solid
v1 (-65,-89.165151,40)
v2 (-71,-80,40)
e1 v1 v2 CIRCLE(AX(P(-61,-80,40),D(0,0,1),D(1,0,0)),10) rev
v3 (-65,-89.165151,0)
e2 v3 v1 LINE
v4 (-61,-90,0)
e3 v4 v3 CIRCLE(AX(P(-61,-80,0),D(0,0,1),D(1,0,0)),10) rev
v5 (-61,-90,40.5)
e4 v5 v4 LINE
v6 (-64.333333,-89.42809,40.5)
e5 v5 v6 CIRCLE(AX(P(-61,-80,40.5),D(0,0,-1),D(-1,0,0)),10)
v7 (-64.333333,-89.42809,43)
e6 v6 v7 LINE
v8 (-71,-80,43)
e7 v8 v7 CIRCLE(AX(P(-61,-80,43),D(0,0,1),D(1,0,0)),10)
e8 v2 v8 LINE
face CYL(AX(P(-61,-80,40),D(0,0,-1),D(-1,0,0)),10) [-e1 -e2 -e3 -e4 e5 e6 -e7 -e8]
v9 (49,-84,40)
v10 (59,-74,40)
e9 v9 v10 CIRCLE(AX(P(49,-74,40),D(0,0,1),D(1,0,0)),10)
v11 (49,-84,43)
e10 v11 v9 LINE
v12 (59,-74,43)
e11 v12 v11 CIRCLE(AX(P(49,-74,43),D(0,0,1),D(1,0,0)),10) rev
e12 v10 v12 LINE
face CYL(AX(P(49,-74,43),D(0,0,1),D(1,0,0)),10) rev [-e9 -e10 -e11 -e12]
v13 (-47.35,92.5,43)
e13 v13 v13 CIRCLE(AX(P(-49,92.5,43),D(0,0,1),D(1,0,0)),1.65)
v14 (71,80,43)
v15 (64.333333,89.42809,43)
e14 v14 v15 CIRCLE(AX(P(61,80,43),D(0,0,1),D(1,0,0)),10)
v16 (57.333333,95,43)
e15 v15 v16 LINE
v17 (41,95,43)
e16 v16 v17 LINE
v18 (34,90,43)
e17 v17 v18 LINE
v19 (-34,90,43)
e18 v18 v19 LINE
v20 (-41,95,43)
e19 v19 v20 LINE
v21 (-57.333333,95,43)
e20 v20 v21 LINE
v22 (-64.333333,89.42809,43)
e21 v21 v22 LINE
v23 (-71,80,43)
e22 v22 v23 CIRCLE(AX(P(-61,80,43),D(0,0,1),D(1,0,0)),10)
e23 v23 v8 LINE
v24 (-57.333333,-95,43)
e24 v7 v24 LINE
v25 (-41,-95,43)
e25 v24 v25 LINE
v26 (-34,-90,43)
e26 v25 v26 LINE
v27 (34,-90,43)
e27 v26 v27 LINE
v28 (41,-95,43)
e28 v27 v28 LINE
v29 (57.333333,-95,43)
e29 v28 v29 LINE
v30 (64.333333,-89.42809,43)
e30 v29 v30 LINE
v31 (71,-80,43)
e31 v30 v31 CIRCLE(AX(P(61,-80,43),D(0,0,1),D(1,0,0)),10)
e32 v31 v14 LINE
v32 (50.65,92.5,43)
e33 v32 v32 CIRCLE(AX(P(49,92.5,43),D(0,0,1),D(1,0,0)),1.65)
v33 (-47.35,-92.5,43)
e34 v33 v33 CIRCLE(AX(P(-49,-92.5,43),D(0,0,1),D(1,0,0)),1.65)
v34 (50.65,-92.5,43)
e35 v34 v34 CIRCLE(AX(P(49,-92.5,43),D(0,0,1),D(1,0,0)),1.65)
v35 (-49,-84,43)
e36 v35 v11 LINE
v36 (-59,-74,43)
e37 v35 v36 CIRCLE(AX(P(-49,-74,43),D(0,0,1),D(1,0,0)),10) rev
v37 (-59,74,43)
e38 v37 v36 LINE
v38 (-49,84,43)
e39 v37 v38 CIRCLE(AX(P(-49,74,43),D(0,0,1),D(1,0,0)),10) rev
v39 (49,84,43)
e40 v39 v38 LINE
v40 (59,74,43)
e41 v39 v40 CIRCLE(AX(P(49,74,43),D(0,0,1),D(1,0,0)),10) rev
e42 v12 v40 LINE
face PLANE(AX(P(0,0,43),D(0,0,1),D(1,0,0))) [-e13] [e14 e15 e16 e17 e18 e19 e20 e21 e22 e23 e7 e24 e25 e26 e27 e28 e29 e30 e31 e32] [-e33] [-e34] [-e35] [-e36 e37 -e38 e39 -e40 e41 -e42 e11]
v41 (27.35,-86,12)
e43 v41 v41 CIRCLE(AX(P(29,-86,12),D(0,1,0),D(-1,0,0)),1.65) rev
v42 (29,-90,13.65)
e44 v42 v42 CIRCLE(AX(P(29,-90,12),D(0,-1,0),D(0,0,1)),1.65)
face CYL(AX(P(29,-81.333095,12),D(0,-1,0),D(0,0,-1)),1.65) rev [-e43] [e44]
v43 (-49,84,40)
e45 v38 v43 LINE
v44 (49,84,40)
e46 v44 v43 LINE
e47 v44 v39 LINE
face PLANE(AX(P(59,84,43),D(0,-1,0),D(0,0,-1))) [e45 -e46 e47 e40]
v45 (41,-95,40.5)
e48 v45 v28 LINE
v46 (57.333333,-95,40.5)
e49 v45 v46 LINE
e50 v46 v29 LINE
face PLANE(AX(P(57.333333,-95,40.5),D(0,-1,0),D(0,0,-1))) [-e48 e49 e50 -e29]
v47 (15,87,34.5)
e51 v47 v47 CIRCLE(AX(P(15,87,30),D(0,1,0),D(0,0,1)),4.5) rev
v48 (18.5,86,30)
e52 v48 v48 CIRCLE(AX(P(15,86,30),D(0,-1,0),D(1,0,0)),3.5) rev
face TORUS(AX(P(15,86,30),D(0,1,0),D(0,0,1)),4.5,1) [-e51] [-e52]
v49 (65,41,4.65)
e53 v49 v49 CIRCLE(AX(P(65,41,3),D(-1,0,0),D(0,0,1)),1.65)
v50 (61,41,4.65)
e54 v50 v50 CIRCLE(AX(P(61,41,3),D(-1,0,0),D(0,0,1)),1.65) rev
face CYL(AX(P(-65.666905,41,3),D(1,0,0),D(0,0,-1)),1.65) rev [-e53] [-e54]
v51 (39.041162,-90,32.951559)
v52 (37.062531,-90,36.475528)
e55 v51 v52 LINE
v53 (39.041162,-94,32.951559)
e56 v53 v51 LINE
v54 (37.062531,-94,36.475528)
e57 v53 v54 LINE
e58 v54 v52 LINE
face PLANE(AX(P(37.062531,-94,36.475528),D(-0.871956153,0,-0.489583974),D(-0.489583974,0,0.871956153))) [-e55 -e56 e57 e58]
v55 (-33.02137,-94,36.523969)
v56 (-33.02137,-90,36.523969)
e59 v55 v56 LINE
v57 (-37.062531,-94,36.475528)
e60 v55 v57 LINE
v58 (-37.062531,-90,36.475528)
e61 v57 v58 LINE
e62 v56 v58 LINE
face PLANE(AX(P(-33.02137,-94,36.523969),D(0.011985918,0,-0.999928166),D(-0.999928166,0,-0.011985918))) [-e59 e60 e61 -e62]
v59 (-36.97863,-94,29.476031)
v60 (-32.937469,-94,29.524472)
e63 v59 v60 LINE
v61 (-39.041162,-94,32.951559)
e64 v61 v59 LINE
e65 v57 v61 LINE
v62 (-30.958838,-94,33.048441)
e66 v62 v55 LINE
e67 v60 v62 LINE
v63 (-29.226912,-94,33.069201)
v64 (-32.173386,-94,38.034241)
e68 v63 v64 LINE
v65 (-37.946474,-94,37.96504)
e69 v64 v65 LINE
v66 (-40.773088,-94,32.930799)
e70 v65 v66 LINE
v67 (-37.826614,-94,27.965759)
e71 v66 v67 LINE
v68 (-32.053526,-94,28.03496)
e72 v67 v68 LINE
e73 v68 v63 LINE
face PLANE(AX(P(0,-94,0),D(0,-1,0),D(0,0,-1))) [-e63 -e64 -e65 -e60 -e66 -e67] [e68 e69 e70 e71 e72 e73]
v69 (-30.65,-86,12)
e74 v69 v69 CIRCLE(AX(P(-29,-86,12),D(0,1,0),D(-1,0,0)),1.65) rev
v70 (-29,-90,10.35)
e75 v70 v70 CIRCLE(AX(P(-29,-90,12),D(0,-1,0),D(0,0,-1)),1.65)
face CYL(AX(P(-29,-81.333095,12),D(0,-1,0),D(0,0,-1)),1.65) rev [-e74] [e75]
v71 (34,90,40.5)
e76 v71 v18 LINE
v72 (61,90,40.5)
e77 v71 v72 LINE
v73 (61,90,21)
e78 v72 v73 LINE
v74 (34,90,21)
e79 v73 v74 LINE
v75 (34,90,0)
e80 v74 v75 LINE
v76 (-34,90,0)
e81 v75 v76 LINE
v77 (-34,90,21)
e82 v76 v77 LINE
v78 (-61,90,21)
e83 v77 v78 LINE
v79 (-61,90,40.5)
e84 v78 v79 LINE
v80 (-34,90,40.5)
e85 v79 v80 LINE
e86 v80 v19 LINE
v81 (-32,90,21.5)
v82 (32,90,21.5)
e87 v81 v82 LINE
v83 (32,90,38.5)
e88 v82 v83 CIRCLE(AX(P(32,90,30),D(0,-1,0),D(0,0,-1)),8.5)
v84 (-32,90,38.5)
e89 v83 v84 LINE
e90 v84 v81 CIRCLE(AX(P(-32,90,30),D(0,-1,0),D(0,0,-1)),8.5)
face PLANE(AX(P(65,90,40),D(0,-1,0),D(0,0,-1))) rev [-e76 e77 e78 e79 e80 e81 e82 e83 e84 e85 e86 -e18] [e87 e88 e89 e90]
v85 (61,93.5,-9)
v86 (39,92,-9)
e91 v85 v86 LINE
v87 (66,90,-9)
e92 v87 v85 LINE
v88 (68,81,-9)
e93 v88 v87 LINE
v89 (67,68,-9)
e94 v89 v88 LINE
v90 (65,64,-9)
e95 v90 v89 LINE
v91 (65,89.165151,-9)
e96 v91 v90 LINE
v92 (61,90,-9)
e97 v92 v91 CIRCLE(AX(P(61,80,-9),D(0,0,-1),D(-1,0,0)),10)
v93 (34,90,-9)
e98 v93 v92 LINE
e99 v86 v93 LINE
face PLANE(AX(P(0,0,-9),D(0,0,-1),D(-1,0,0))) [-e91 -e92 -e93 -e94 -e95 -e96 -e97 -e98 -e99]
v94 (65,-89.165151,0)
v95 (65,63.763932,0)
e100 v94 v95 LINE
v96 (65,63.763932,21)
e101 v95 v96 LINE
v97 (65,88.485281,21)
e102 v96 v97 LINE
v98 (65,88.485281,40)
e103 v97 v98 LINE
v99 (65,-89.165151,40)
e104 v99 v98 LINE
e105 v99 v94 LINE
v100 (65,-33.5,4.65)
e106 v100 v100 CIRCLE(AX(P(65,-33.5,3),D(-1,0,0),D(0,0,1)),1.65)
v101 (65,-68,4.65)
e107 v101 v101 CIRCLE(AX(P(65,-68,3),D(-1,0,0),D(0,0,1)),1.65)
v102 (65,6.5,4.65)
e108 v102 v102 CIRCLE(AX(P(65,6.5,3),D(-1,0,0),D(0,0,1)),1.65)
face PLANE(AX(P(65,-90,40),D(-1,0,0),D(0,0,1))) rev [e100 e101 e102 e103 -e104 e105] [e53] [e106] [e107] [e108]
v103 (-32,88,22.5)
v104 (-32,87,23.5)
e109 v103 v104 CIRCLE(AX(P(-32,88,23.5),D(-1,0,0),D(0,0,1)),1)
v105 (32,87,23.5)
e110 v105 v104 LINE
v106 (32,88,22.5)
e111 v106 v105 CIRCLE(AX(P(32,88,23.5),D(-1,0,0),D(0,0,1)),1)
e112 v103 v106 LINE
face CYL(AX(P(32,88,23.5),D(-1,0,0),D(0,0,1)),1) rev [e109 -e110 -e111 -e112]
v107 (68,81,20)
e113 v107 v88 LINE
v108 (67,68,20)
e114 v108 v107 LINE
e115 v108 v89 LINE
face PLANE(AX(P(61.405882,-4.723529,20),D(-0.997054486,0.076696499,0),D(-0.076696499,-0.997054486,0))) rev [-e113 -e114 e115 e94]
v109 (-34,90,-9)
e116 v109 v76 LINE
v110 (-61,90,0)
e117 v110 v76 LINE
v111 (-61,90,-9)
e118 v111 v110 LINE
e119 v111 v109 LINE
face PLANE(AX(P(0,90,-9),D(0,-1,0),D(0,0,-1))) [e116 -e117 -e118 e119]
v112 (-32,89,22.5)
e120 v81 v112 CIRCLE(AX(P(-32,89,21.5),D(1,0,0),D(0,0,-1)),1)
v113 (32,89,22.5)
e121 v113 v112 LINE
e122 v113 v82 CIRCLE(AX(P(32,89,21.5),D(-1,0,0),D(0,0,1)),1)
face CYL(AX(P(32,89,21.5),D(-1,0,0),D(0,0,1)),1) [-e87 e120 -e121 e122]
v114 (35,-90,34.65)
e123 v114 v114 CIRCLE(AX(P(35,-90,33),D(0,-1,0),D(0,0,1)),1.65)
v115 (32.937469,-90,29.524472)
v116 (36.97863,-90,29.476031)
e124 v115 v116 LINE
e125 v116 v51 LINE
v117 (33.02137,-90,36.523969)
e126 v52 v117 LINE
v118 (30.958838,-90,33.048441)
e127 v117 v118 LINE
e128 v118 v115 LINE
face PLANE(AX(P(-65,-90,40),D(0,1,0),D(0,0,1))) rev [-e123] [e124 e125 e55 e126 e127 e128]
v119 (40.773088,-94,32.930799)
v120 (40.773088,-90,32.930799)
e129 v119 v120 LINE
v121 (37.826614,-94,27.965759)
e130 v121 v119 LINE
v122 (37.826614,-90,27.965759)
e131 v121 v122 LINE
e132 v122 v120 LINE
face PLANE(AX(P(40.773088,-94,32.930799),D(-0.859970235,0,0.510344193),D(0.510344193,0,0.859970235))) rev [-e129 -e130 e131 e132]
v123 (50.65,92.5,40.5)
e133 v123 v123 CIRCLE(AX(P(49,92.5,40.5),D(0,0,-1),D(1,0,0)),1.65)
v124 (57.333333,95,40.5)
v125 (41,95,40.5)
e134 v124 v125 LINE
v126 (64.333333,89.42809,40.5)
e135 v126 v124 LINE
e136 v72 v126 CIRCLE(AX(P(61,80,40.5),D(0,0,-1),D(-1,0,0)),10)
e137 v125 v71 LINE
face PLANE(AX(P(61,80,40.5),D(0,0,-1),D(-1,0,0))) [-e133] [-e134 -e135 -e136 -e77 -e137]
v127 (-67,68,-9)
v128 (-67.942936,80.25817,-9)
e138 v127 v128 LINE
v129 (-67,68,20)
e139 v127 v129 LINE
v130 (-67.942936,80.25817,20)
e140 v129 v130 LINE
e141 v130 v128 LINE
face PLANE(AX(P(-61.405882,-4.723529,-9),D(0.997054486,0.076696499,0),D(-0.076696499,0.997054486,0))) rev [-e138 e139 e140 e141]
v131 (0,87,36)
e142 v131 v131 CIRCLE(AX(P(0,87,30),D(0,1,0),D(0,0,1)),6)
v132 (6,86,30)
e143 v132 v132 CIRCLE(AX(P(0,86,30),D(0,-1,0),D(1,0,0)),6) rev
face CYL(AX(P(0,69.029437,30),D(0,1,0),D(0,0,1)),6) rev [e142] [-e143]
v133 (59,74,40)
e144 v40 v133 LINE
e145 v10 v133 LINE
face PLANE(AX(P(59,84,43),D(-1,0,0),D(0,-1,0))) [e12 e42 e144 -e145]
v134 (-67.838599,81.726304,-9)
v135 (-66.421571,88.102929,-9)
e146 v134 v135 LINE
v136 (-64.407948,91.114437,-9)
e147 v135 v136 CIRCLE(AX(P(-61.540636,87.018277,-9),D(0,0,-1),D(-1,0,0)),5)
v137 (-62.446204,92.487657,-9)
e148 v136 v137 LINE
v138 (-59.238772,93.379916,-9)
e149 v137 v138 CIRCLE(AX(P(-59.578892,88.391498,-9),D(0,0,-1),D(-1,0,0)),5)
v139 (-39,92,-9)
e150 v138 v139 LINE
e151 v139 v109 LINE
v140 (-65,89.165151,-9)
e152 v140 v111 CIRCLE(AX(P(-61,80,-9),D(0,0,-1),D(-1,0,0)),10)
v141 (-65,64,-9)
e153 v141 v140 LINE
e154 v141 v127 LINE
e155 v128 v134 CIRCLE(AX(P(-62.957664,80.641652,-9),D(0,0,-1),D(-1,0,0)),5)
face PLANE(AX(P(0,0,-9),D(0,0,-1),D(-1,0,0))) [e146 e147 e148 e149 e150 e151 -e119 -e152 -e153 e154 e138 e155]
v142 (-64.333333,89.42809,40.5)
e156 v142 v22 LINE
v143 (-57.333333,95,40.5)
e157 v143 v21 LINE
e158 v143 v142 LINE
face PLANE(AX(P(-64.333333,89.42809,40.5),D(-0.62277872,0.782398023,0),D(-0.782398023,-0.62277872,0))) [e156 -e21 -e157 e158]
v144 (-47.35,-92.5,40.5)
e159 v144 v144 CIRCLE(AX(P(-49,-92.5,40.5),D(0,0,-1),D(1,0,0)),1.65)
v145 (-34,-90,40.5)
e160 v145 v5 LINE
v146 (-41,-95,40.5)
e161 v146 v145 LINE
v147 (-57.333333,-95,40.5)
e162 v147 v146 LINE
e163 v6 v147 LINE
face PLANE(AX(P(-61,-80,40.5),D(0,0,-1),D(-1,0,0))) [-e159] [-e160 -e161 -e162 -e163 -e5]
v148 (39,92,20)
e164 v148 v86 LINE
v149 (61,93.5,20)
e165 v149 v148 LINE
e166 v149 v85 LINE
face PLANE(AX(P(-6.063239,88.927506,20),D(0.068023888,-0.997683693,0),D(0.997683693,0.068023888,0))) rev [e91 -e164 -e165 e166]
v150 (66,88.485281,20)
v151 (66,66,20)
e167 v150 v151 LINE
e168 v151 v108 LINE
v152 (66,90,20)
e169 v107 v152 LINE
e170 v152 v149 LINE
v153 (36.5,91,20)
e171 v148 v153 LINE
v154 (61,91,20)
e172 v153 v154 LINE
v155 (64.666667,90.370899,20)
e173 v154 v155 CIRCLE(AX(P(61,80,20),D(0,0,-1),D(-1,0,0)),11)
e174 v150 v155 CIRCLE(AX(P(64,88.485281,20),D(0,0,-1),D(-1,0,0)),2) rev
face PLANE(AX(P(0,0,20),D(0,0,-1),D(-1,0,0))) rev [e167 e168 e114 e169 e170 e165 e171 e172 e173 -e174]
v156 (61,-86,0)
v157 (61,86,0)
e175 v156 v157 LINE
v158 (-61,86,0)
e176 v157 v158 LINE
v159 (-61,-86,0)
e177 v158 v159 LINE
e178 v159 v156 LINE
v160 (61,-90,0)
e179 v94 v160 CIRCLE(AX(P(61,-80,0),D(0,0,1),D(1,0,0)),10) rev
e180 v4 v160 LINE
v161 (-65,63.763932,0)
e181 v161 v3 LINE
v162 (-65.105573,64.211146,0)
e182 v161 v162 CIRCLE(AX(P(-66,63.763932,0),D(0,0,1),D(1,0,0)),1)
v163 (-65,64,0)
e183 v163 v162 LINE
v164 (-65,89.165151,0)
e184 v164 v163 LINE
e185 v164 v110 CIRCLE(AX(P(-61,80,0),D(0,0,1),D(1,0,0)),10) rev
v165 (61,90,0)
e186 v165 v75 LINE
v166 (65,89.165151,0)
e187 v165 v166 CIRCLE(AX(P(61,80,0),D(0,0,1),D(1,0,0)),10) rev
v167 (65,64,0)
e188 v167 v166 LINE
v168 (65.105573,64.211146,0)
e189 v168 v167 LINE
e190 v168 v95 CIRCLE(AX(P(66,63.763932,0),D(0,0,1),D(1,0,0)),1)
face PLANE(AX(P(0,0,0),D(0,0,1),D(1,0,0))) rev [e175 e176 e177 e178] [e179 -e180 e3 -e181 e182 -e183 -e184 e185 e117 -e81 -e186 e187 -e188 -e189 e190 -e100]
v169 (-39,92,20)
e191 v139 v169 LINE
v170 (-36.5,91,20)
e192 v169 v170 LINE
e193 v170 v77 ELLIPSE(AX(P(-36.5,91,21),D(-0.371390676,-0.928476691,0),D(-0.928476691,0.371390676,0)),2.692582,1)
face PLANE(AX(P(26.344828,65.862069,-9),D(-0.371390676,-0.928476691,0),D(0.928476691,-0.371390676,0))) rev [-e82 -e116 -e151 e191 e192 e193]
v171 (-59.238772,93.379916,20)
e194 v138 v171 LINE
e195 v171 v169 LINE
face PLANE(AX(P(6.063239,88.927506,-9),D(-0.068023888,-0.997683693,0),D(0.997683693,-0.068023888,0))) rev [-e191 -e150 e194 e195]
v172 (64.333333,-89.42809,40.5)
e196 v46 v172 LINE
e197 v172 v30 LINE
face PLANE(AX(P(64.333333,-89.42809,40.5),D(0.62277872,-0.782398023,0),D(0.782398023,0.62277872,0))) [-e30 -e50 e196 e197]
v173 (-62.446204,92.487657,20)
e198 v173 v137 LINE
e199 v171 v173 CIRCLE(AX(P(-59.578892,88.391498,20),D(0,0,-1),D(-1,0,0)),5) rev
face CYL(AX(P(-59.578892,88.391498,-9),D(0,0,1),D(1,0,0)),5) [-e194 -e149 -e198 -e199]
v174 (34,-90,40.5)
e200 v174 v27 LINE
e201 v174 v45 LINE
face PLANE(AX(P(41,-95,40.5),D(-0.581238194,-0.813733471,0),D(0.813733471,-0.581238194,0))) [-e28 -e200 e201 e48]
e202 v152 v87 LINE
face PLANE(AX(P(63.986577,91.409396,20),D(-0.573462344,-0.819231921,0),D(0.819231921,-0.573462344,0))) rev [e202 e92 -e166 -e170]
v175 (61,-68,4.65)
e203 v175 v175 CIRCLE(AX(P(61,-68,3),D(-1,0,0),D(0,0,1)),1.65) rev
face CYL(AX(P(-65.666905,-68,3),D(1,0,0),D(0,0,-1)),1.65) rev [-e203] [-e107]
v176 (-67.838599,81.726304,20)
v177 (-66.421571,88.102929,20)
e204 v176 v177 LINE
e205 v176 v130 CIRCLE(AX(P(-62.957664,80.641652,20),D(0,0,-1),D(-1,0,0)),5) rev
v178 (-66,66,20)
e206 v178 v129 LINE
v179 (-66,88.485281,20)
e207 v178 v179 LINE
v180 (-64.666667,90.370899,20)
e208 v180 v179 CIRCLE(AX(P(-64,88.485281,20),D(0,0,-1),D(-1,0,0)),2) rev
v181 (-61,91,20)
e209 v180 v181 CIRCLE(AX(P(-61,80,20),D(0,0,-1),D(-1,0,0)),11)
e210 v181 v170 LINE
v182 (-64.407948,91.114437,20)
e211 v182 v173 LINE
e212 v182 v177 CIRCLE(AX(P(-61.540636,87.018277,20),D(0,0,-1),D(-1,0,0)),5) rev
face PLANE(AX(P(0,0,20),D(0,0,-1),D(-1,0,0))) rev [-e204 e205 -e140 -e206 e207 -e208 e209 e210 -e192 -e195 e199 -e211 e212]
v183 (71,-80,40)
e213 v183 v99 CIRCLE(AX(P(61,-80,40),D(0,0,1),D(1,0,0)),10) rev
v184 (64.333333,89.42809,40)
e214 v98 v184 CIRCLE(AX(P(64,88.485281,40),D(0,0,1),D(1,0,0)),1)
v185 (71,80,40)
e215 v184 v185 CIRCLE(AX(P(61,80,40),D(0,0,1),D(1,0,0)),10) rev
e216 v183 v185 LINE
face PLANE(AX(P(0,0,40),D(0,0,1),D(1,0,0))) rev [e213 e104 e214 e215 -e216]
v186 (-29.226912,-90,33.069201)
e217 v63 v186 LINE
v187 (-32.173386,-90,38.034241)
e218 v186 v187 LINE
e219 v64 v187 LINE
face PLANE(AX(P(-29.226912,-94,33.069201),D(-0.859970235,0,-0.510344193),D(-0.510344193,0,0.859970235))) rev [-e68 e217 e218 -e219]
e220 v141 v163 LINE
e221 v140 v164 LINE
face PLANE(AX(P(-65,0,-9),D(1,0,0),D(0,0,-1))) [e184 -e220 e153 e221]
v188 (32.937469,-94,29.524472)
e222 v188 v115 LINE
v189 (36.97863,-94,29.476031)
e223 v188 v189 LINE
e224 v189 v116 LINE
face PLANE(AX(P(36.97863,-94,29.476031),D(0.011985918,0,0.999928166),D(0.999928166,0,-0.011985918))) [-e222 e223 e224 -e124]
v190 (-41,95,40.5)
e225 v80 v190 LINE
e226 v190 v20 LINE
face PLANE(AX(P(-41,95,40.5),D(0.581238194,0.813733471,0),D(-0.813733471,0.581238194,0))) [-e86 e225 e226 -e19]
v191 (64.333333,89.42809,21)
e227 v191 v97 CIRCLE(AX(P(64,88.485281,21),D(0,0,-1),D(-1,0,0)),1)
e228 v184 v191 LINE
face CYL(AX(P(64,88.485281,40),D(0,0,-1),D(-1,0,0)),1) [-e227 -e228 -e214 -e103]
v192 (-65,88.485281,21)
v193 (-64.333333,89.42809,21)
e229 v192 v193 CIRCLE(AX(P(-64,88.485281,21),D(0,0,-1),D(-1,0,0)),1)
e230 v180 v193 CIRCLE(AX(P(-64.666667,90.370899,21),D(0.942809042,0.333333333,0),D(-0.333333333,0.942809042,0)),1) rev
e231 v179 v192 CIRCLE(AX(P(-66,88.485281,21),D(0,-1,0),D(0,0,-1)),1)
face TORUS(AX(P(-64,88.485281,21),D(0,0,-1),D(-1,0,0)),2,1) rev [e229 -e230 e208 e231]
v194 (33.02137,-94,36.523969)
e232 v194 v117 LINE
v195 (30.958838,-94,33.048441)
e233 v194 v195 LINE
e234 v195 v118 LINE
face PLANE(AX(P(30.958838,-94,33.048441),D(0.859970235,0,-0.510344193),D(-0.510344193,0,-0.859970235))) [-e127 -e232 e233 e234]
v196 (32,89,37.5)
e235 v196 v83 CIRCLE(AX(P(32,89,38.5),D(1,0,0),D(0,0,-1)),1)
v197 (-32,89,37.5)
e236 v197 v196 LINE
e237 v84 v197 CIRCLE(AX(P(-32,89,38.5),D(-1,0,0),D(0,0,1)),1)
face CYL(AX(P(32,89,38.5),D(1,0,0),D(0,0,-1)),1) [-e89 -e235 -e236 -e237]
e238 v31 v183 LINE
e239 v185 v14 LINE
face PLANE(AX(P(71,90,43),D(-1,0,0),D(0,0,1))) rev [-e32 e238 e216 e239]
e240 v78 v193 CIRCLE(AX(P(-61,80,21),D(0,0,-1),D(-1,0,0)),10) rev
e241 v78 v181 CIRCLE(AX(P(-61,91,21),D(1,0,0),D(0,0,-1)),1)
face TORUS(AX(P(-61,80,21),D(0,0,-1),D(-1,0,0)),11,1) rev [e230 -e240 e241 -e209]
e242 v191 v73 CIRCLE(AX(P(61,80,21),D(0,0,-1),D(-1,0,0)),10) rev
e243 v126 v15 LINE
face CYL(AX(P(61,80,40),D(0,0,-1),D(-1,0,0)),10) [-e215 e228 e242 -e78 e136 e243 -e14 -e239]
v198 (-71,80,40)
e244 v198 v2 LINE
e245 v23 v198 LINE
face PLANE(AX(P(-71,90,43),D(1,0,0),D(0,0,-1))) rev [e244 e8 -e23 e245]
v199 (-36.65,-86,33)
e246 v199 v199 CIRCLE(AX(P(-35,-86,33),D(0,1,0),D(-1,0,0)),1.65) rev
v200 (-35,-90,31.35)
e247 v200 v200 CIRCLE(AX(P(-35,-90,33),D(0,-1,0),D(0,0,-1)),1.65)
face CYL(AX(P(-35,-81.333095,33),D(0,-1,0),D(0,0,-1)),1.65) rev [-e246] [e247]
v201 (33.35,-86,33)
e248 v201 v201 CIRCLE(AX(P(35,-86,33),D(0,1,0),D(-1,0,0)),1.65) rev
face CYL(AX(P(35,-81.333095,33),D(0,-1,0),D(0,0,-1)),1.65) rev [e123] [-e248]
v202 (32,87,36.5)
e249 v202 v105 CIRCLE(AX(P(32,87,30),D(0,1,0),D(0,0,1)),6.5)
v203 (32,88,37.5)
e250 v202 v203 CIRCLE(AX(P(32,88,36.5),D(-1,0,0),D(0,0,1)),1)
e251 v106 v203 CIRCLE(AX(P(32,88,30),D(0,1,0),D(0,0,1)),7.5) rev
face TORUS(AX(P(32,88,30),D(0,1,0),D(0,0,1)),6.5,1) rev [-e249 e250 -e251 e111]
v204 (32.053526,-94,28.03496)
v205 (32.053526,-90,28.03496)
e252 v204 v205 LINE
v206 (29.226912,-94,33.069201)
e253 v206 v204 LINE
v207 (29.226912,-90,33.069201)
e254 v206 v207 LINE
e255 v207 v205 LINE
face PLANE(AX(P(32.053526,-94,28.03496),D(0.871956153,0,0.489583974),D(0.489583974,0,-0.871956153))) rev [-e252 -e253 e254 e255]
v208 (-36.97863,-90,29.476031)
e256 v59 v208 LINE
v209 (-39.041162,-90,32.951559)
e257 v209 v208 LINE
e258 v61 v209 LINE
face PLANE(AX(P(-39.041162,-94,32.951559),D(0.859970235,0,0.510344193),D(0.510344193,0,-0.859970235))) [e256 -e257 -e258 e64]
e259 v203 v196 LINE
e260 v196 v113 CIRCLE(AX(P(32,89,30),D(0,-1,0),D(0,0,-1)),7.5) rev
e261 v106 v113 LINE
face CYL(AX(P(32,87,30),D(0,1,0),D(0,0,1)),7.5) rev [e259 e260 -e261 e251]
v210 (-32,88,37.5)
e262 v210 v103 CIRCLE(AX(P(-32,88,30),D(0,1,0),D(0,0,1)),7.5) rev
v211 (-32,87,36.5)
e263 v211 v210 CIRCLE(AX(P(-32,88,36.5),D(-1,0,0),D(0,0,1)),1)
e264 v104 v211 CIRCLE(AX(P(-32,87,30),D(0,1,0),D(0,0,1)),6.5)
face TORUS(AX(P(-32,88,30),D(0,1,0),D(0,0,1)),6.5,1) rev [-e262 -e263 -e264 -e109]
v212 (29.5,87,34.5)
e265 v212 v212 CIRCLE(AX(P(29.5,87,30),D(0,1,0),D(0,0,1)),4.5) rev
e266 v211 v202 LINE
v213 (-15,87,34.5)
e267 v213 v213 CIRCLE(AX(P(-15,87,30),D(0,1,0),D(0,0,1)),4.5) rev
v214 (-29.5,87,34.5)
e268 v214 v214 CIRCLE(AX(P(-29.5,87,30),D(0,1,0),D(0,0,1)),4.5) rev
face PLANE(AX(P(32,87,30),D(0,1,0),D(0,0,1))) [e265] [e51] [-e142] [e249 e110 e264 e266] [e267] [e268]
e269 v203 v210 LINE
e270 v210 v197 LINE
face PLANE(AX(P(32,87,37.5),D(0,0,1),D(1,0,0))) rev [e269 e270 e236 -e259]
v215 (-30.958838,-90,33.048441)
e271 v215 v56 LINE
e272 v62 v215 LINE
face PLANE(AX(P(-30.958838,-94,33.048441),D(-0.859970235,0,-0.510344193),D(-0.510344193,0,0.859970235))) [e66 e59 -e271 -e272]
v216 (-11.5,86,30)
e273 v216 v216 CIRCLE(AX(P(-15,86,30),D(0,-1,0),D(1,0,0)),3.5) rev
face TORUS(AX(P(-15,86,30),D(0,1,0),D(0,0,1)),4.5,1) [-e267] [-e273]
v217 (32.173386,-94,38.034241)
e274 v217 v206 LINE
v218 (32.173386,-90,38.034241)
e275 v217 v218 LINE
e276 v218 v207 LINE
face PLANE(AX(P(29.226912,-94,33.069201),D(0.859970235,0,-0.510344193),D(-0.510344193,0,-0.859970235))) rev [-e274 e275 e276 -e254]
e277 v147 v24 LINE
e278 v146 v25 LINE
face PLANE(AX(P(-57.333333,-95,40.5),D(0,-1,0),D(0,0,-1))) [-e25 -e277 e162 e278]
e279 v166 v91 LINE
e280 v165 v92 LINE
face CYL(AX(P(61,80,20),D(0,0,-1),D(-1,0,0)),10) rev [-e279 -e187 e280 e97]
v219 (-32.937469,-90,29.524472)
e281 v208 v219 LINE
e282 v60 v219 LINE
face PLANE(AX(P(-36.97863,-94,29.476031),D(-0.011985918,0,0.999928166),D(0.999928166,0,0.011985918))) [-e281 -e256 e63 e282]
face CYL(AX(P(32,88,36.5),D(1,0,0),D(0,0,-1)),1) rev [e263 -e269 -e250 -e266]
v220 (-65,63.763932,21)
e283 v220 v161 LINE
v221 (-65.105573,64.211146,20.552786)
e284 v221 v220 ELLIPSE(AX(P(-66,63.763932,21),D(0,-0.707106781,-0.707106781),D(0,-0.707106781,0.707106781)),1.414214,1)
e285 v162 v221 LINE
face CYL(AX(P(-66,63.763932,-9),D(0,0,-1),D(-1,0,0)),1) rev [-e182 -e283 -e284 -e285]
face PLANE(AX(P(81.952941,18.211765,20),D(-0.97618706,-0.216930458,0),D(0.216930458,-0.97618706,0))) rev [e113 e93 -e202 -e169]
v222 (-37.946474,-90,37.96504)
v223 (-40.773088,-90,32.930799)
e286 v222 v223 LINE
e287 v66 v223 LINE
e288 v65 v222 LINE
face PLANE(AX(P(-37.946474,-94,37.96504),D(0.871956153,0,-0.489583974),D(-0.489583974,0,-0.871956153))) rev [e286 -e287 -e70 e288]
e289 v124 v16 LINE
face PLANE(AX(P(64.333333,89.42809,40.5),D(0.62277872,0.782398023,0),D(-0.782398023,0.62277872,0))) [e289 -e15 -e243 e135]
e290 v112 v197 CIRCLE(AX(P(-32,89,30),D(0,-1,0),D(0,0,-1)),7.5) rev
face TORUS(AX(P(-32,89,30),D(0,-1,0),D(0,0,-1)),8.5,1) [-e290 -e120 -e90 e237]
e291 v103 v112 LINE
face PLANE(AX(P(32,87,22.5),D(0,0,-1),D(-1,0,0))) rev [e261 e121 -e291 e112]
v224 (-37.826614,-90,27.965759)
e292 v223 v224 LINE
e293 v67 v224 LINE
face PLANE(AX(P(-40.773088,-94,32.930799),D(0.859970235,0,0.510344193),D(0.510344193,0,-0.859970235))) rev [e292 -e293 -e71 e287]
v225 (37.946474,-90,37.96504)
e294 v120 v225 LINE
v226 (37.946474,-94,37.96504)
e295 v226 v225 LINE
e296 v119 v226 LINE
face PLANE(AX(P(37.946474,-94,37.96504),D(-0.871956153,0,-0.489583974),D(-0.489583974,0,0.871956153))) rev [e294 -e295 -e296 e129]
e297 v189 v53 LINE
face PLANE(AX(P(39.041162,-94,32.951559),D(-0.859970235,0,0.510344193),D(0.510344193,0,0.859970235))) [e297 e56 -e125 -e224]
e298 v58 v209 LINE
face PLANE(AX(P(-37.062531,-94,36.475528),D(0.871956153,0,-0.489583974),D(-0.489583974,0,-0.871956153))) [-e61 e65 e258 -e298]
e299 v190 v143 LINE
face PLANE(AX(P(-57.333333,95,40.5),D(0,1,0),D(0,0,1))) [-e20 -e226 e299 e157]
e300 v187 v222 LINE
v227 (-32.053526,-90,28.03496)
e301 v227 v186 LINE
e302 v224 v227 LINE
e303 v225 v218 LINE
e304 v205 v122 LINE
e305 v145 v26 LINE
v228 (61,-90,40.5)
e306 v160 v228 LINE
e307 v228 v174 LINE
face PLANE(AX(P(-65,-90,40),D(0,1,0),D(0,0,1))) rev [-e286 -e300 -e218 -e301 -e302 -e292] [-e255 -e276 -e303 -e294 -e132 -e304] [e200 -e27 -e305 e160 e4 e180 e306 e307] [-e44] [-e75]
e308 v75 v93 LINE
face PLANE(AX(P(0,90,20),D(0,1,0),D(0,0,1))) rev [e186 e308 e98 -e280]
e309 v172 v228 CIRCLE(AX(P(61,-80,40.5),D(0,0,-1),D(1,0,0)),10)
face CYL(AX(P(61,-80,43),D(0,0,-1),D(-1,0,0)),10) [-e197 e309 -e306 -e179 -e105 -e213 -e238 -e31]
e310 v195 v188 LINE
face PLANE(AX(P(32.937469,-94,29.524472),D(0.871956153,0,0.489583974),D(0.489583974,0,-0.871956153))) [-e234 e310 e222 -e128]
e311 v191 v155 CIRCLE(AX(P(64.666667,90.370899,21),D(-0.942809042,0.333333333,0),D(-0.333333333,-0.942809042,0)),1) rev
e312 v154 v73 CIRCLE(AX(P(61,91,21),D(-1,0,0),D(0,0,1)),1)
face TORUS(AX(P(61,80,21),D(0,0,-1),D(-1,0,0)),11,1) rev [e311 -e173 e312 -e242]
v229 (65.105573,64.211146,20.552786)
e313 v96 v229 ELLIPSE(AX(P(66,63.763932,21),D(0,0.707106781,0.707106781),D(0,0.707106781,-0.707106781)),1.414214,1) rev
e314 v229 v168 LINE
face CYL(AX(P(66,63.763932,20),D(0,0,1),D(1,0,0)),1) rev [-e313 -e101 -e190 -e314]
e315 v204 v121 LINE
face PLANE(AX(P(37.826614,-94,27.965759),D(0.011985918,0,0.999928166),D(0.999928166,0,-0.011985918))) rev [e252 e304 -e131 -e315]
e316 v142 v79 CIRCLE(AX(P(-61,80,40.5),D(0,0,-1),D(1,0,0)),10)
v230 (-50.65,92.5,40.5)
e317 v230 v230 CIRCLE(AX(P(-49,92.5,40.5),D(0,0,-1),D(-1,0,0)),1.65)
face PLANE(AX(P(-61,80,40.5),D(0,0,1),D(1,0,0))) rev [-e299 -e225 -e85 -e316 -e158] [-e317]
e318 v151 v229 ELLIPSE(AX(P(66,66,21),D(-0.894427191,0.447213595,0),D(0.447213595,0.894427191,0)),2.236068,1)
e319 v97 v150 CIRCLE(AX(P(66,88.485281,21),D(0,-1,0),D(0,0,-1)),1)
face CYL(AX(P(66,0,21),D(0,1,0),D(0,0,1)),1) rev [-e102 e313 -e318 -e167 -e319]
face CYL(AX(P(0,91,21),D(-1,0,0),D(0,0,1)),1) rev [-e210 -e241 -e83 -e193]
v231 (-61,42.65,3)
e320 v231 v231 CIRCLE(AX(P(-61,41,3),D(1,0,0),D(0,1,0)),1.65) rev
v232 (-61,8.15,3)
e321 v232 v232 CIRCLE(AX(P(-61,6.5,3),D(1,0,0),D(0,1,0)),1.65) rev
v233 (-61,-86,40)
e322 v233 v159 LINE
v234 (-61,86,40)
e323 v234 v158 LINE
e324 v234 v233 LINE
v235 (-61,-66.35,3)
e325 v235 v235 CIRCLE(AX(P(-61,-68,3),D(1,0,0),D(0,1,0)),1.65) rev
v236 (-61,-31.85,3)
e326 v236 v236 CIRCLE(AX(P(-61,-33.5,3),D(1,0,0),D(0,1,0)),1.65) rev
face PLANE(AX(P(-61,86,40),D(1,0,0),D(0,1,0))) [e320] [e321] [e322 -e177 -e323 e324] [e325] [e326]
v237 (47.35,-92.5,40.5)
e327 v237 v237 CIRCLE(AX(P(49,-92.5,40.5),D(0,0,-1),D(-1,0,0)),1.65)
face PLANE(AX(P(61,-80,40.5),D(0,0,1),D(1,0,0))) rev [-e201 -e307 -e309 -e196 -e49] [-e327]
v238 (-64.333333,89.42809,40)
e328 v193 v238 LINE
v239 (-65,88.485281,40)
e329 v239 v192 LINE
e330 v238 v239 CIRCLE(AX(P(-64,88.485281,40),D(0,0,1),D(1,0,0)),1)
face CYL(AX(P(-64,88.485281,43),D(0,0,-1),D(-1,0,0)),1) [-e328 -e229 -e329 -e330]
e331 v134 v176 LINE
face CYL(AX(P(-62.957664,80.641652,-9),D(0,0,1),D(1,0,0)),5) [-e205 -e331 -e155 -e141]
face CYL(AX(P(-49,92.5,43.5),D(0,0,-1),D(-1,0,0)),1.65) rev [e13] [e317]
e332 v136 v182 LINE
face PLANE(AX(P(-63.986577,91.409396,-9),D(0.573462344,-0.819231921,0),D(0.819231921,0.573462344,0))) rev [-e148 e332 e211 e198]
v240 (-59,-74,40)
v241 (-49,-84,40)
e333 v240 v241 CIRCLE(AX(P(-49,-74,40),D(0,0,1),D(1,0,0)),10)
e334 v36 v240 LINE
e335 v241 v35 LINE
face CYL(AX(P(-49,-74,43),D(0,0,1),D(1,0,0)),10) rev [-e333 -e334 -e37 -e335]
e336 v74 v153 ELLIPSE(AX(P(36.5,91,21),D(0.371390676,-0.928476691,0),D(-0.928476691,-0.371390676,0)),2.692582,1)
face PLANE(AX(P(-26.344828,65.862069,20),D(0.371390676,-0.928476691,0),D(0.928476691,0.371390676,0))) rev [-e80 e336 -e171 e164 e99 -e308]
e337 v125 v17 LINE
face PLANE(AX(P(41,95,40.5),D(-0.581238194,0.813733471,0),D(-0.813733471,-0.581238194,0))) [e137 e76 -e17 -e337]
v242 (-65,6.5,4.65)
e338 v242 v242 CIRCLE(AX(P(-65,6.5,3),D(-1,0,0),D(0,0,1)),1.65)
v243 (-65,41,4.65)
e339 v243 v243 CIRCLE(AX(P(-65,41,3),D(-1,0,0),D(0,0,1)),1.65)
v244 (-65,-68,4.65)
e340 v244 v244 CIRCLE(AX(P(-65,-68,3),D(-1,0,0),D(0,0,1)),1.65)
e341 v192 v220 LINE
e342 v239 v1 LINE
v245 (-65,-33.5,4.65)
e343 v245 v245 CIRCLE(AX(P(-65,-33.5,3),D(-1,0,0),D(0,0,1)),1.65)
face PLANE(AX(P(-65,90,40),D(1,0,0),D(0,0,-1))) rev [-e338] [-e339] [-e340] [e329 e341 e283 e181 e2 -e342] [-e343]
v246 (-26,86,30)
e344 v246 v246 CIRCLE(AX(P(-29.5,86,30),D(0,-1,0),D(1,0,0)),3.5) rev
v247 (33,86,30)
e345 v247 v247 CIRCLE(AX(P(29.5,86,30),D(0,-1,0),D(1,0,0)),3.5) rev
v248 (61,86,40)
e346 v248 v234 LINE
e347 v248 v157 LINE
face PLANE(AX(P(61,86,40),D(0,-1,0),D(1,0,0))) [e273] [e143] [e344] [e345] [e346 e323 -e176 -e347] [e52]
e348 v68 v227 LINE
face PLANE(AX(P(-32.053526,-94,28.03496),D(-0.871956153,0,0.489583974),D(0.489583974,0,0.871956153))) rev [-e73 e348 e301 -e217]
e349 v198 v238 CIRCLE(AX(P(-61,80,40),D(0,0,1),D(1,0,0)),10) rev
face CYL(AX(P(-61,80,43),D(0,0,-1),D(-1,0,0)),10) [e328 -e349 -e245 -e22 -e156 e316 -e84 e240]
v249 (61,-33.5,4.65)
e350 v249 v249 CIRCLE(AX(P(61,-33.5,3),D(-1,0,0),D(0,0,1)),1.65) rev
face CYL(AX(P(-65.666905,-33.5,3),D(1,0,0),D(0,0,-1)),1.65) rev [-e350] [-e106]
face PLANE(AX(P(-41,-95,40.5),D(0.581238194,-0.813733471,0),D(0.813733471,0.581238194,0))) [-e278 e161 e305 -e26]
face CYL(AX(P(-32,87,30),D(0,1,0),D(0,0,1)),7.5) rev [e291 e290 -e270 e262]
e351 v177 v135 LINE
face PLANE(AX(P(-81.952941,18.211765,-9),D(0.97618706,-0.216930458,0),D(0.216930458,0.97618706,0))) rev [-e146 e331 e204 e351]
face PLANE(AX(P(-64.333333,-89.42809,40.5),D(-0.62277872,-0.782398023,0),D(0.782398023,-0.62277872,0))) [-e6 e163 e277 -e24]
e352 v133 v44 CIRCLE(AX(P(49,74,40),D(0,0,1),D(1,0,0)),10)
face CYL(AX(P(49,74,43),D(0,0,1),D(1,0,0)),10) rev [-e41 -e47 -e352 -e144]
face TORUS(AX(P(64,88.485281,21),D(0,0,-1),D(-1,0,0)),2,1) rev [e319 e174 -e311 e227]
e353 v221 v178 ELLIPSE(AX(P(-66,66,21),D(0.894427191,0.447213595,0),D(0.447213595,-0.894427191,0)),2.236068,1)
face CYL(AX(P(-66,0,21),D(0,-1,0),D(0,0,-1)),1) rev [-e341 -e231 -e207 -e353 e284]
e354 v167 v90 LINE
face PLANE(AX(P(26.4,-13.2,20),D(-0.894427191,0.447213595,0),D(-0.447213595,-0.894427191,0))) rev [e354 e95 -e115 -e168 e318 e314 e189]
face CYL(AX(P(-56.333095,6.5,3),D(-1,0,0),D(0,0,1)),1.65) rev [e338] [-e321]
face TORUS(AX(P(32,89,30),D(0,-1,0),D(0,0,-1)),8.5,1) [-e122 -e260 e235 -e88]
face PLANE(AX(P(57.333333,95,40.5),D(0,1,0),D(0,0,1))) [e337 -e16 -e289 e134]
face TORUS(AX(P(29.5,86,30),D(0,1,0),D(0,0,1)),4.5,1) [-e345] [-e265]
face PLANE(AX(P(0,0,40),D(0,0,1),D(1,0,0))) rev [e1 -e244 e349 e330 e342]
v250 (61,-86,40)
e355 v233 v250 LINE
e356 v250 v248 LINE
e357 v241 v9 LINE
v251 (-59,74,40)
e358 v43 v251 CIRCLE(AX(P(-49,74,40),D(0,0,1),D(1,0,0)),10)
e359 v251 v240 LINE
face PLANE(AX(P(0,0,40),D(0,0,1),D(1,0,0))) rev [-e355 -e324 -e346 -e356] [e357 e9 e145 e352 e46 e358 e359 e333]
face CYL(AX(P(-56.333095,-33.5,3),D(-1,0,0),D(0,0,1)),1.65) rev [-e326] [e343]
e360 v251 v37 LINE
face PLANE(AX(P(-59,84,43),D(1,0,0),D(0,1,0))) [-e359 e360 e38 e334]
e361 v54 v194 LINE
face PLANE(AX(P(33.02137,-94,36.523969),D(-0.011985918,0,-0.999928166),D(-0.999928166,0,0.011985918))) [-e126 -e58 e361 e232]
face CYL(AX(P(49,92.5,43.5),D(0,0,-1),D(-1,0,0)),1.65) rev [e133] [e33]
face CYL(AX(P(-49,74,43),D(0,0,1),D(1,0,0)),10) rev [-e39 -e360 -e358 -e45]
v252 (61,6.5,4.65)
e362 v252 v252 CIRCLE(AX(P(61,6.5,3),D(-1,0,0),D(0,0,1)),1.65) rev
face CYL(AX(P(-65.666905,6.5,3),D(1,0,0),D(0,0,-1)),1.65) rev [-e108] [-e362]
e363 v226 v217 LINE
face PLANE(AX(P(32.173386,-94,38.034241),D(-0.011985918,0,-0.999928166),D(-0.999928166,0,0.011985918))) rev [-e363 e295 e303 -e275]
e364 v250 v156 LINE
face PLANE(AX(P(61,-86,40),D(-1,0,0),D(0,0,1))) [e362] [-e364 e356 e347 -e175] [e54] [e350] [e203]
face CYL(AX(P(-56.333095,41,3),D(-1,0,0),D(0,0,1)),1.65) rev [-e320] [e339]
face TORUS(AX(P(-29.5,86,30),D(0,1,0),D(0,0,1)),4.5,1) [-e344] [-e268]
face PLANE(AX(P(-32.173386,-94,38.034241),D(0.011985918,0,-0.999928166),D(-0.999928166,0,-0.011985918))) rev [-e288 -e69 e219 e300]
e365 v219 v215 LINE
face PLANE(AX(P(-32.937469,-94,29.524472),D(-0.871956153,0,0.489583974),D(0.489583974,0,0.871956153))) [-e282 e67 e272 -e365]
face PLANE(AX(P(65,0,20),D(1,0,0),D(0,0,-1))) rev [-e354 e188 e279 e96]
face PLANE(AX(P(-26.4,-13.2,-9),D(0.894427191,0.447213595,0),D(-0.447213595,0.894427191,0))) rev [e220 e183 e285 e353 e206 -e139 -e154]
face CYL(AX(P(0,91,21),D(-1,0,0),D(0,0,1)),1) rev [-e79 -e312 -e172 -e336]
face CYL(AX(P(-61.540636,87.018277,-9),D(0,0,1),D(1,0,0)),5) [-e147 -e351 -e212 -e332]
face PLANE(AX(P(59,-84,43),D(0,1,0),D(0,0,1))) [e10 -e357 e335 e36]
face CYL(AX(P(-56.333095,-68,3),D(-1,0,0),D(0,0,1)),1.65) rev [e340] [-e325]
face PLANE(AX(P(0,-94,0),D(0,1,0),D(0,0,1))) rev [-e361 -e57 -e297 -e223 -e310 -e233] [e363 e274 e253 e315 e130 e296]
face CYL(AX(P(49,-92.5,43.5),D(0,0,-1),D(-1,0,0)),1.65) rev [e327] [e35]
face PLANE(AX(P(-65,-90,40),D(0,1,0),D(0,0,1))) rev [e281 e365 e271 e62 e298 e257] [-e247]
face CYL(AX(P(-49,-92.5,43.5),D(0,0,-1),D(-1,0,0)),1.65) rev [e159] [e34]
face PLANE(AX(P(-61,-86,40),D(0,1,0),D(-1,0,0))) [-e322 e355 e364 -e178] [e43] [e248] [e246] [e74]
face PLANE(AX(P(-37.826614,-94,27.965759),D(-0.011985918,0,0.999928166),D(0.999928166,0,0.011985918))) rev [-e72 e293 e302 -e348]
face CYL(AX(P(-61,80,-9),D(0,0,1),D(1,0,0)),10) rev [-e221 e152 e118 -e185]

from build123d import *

# Parameters (mm, degrees)
SKETCH_1_W           = 130
SKETCH_1_H           = 180
SKETCH_1_W_2         = 122
SKETCH_1_H_2         = 172
EXTRUDE_1_DEPTH      = 40
EXTRUDE_START        = 40
SKETCH_3_W           = 142
SKETCH_3_H           = 180
SKETCH_3_W_2         = 118
SKETCH_3_H_2         = 168
EXTRUDE_2_DEPTH      = 3
FILLET_1_R           = 10
SKETCH_4_R           = 1.65
CUT_EXTRUDE_1_DEPTH  = 4
EXTRUDE_3_DEPTH      = 4
CUT_EXTRUDE_2_DEPTH  = 3
SKETCH_8_R           = 6
SKETCH_8_R_2         = 3.5
CUT_EXTRUDE_3_DEPTH  = 4
EXTRUDE_4_DEPTH      = 9
EXTRUDE_4_DEPTH_BACK = 20
FILLET_4_R           = 1
FILLET_5_R           = 5
EXTRUDE_5_DEPTH      = 2.5
SKETCH_13_R          = 1.65
CUT_EXTRUDE_4_DEPTH  = 3
FILLET_6_R           = 1
FILLET_7_R           = 1
FILLET_8_R           = 1
SKETCH_15_R          = 1.65
CUT_EXTRUDE_5_DEPTH  = 126


with BuildPart() as part:
    # 草图1 → 凸台-拉伸1 (new body)
    with BuildSketch(Plane.XY):
        Rectangle(SKETCH_1_W, SKETCH_1_H)
        Rectangle(SKETCH_1_W_2, SKETCH_1_H_2, mode=Mode.SUBTRACT)
    extrude(amount=EXTRUDE_1_DEPTH)

    # 草图3 → 凸台-拉伸2 (add)
    with BuildSketch(Plane.XY.offset(EXTRUDE_START)):
        Rectangle(SKETCH_3_W, SKETCH_3_H)
        Rectangle(SKETCH_3_W_2, SKETCH_3_H_2, mode=Mode.SUBTRACT)
    extrude(amount=EXTRUDE_2_DEPTH)

    # 圆角1
    fillet_1_edges = [part.edges().sort_by_distance(p)[0] for p in [
        (59, 84, 41.5),
        (71, 90, 41.5),
        (-71, 90, 41.5),
        (-59, 84, 41.5),
        (59, -84, 41.5),
        (71, -90, 41.5),
        (-59, -84, 41.5),
        (-71, -90, 41.5),
    ]]
    fillet(fillet_1_edges, radius=FILLET_1_R)

    # 草图4 → 切除-拉伸1 (cut)
    with BuildSketch(Plane.XZ.offset(90)):
        with Locations(Location((-35, 33, 0), (0, 0, 270))):
            Circle(SKETCH_4_R)
        with Locations(Location((35, 33, 0), (0, 0, 180))):
            Circle(SKETCH_4_R)
        with Locations(Location((-29, 12, 0), (0, 0, 270))):
            Circle(SKETCH_4_R)
        with Locations(Location((29, 12, 0), (0, 0, 180))):
            Circle(SKETCH_4_R)
    extrude(amount=-CUT_EXTRUDE_1_DEPTH, mode=Mode.SUBTRACT)

    # 草图5 → 凸台-拉伸3 (add)
    # profile 1 of 2: a face of its own
    with BuildSketch(Plane.XZ.offset(90)):
        Polygon((-32.17338561, 38.034241196), (-37.94647357, 37.965040467), (-40.77308796, 32.930799271), (-37.82661439, 27.965758804), (-32.05352643, 28.034959533), (-29.22691204, 33.069200729), align=None)
        Polygon((-33.021369927, 36.523968837), (-37.062531499, 36.475528327), (-39.041161572, 32.951559489), (-36.978630073, 29.476031163), (-32.937468501, 29.524471673), (-30.958838428, 33.048440511), align=None, mode=Mode.SUBTRACT)
    # profile 2 of 2: a face of its own
    with BuildSketch(Plane.XZ.offset(90)):
        Polygon((40.77308796, 32.930799271), (37.82661439, 27.965758804), (32.05352643, 28.034959533), (29.22691204, 33.069200729), (32.17338561, 38.034241196), (37.94647357, 37.965040467), align=None)
        Polygon((39.041161572, 32.951559489), (36.978630073, 29.476031163), (32.937468501, 29.524471673), (30.958838428, 33.048440511), (33.021369927, 36.523968837), (37.062531499, 36.475528327), align=None, mode=Mode.SUBTRACT)
    extrude(amount=EXTRUDE_3_DEPTH)

    # 草图7 → 切除-拉伸2 (cut)
    with BuildSketch(Plane(origin=(0, 90, 0), x_dir=(1, 0, 0), z_dir=(0, 1, 0))):
        with BuildLine():
            Line((32, -37.5), (-32, -37.5))
            ThreePointArc((-32, -37.5), (-39.5, -30), (-32, -22.5))
            Line((-32, -22.5), (32, -22.5))
            ThreePointArc((32, -22.5), (39.5, -30), (32, -37.5))
        make_face()
    extrude(amount=-CUT_EXTRUDE_2_DEPTH, mode=Mode.SUBTRACT)

    # 草图8 → 切除-拉伸3 (cut)
    with BuildSketch(Plane(origin=(0, 90, 0), x_dir=(1, 0, 0), z_dir=(0, 1, 0))):
        with Locations(Location((0, -30, 0), (0, 0, 270))):
            Circle(SKETCH_8_R)
        with Locations(Location((-15, -30, 0), (0, 0, 270))):
            Circle(SKETCH_8_R_2)
        with Locations(Location((-29.5, -30, 0), (0, 0, 270))):
            Circle(SKETCH_8_R_2)
        with Locations(Location((29.5, -30, 0), (0, 0, 270))):
            Circle(SKETCH_8_R_2)
        with Locations(Location((15, -30, 0), (0, 0, 270))):
            Circle(SKETCH_8_R_2)
    extrude(amount=-CUT_EXTRUDE_3_DEPTH, mode=Mode.SUBTRACT)

    # 草图11 → 凸台-拉伸4 (add, two sides: drawn at the far end of the back side and taken through both)
    with BuildSketch(Plane(origin=(0, 0, 0), x_dir=(-1, 0, 0), z_dir=(0, 0, -1)).offset(-EXTRUDE_4_DEPTH_BACK)):
        with BuildLine():
            Line((39, 92), (34, 90))
            Line((34, 90), (61, 90))
            ThreePointArc((61, 90), (63.043096437, 89.789063129), (65, 89.16515139))
            Line((65, 89.16515139), (65, 64))
            Line((65, 64), (67, 68))
            Line((67, 68), (68, 81))
            Line((68, 81), (66, 90))
            Line((66, 90), (61, 93.5))
            Line((61, 93.5), (39, 92))
        make_face()
        with BuildLine():
            Line((-67, 68), (-65, 64))
            Line((-65, 64), (-65, 89.16515139))
            ThreePointArc((-65, 89.16515139), (-63.043096437, 89.789063129), (-61, 90))
            Line((-61, 90), (-34, 90))
            Line((-34, 90), (-39, 92))
            Line((-39, 92), (-61, 93.5))
            Line((-61, 93.5), (-66, 90))
            Line((-66, 90), (-68, 81))
            Line((-68, 81), (-67, 68))
        make_face()
    extrude(amount=EXTRUDE_4_DEPTH + EXTRUDE_4_DEPTH_BACK)

    # 圆角4
    fillet_4_edges = [part.edges().sort_by_distance(p)[0] for p in [
        (-65, 64, 10),
        (-65, 76.582575695, 20),
        (-63.043096437, 89.789063129, 20),
        (-47.5, 90, 20),
        (65, 89.16515139, 30),
        (65, 64, 10),
        (47.5, 90, 20),
        (63.043096437, 89.789063129, 20),
        (65, 76.582575695, 20),
        (-65, 89.16515139, 30),
    ]]
    fillet(fillet_4_edges, radius=FILLET_4_R)

    # 圆角5
    fillet_5_edges = [part.edges().sort_by_distance(p)[0] for p in [
        (-68, 81, 5.5),
        (-66, 90, 5.5),
        (-61, 93.5, 5.5),
    ]]
    fillet(fillet_5_edges, radius=FILLET_5_R)

    # 草图12 → 凸台-拉伸5 (add)
    with BuildSketch(Plane.XY.offset(43)):
        with BuildLine():
            Line((64.333333333, 89.428090416), (57.333333333, 95))
            Line((57.333333333, 95), (41, 95))
            Line((41, 95), (34, 90))
            Line((34, 90), (61, 90))
            ThreePointArc((61, 90), (62.691019787, 89.855985597), (64.333333333, 89.428090416))
        make_face()
        with BuildLine():
            Line((-34, 90), (-61, 90))
            ThreePointArc((-61, 90), (-62.691019787, 89.855985597), (-64.333333333, 89.428090416))
            Line((-64.333333333, 89.428090416), (-57.333333333, 95))
            Line((-57.333333333, 95), (-41, 95))
            Line((-41, 95), (-34, 90))
        make_face()
        with BuildLine():
            Line((34, -90), (61, -90))
            ThreePointArc((61, -90), (62.691019787, -89.855985597), (64.333333333, -89.428090416))
            Line((64.333333333, -89.428090416), (57.333333333, -95))
            Line((57.333333333, -95), (41, -95))
            Line((41, -95), (34, -90))
        make_face()
        with BuildLine():
            Line((-64.333333333, -89.428090416), (-57.333333333, -95))
            Line((-57.333333333, -95), (-41, -95))
            Line((-41, -95), (-34, -90))
            Line((-34, -90), (-61, -90))
            ThreePointArc((-61, -90), (-62.691019787, -89.855985597), (-64.333333333, -89.428090416))
        make_face()
    extrude(amount=-EXTRUDE_5_DEPTH)

    # 草图13 → 切除-拉伸4 (cut)
    with BuildSketch(Plane(origin=(0, 0, 40.5), x_dir=(-1, 0, 0), z_dir=(0, 0, -1))):
        with Locations((49, 92.5)):
            Circle(SKETCH_13_R)
        with Locations(Location((-49, 92.5, 0), (0, 0, 180))):
            Circle(SKETCH_13_R)
        with Locations((-49, -92.5)):
            Circle(SKETCH_13_R)
        with Locations(Location((49, -92.5, 0), (0, 0, 180))):
            Circle(SKETCH_13_R)
    extrude(amount=-CUT_EXTRUDE_4_DEPTH, mode=Mode.SUBTRACT)

    # 圆角6
    fillet_6_edges = [part.edges().sort_by_distance(p)[0] for p in [
        (15, 87, 26.5),
        (29.5, 87, 26.5),
        (-29.5, 87, 26.5),
        (-15, 87, 26.5),
    ]]
    fillet(fillet_6_edges, radius=FILLET_6_R - 0.0001)  # a hair under: the kernel refuses the full size

    # 圆角7
    fillet_7_edges = [part.edges().sort_by_distance(p)[0] for p in [
        (39.5, 87, 30),
        (0, 87, 37.5),
        (-39.5, 87, 30),
        (0, 87, 22.5),
    ]]
    fillet(fillet_7_edges, radius=FILLET_7_R)

    # 圆角8
    fillet_8_edges = [part.edges().sort_by_distance(p)[0] for p in [
        (39.5, 90, 30),
        (0, 90, 22.5),
        (-39.5, 90, 30),
        (0, 90, 37.5),
    ]]
    fillet(fillet_8_edges, radius=FILLET_8_R)

    # 草图15 → 切除-拉伸5 (cut)
    with BuildSketch(Plane.ZY.offset(65)):
        with Locations((3, -33.5)):
            Circle(SKETCH_15_R)
        with Locations((3, -68)):
            Circle(SKETCH_15_R)
        with Locations((3, 6.5)):
            Circle(SKETCH_15_R)
        with Locations((3, 41)):
            Circle(SKETCH_15_R)
    cut_extrude_5 = extrude(amount=-CUT_EXTRUDE_5_DEPTH, mode=Mode.SUBTRACT)

    # 镜向1: 切除-拉伸5 across plane
    add(cut_extrude_5.mirror(Plane(origin=(0, 0, 0), x_dir=(0, 0, 1), z_dir=(1, 0, 0))), mode=Mode.SUBTRACT)


solid = part.part
